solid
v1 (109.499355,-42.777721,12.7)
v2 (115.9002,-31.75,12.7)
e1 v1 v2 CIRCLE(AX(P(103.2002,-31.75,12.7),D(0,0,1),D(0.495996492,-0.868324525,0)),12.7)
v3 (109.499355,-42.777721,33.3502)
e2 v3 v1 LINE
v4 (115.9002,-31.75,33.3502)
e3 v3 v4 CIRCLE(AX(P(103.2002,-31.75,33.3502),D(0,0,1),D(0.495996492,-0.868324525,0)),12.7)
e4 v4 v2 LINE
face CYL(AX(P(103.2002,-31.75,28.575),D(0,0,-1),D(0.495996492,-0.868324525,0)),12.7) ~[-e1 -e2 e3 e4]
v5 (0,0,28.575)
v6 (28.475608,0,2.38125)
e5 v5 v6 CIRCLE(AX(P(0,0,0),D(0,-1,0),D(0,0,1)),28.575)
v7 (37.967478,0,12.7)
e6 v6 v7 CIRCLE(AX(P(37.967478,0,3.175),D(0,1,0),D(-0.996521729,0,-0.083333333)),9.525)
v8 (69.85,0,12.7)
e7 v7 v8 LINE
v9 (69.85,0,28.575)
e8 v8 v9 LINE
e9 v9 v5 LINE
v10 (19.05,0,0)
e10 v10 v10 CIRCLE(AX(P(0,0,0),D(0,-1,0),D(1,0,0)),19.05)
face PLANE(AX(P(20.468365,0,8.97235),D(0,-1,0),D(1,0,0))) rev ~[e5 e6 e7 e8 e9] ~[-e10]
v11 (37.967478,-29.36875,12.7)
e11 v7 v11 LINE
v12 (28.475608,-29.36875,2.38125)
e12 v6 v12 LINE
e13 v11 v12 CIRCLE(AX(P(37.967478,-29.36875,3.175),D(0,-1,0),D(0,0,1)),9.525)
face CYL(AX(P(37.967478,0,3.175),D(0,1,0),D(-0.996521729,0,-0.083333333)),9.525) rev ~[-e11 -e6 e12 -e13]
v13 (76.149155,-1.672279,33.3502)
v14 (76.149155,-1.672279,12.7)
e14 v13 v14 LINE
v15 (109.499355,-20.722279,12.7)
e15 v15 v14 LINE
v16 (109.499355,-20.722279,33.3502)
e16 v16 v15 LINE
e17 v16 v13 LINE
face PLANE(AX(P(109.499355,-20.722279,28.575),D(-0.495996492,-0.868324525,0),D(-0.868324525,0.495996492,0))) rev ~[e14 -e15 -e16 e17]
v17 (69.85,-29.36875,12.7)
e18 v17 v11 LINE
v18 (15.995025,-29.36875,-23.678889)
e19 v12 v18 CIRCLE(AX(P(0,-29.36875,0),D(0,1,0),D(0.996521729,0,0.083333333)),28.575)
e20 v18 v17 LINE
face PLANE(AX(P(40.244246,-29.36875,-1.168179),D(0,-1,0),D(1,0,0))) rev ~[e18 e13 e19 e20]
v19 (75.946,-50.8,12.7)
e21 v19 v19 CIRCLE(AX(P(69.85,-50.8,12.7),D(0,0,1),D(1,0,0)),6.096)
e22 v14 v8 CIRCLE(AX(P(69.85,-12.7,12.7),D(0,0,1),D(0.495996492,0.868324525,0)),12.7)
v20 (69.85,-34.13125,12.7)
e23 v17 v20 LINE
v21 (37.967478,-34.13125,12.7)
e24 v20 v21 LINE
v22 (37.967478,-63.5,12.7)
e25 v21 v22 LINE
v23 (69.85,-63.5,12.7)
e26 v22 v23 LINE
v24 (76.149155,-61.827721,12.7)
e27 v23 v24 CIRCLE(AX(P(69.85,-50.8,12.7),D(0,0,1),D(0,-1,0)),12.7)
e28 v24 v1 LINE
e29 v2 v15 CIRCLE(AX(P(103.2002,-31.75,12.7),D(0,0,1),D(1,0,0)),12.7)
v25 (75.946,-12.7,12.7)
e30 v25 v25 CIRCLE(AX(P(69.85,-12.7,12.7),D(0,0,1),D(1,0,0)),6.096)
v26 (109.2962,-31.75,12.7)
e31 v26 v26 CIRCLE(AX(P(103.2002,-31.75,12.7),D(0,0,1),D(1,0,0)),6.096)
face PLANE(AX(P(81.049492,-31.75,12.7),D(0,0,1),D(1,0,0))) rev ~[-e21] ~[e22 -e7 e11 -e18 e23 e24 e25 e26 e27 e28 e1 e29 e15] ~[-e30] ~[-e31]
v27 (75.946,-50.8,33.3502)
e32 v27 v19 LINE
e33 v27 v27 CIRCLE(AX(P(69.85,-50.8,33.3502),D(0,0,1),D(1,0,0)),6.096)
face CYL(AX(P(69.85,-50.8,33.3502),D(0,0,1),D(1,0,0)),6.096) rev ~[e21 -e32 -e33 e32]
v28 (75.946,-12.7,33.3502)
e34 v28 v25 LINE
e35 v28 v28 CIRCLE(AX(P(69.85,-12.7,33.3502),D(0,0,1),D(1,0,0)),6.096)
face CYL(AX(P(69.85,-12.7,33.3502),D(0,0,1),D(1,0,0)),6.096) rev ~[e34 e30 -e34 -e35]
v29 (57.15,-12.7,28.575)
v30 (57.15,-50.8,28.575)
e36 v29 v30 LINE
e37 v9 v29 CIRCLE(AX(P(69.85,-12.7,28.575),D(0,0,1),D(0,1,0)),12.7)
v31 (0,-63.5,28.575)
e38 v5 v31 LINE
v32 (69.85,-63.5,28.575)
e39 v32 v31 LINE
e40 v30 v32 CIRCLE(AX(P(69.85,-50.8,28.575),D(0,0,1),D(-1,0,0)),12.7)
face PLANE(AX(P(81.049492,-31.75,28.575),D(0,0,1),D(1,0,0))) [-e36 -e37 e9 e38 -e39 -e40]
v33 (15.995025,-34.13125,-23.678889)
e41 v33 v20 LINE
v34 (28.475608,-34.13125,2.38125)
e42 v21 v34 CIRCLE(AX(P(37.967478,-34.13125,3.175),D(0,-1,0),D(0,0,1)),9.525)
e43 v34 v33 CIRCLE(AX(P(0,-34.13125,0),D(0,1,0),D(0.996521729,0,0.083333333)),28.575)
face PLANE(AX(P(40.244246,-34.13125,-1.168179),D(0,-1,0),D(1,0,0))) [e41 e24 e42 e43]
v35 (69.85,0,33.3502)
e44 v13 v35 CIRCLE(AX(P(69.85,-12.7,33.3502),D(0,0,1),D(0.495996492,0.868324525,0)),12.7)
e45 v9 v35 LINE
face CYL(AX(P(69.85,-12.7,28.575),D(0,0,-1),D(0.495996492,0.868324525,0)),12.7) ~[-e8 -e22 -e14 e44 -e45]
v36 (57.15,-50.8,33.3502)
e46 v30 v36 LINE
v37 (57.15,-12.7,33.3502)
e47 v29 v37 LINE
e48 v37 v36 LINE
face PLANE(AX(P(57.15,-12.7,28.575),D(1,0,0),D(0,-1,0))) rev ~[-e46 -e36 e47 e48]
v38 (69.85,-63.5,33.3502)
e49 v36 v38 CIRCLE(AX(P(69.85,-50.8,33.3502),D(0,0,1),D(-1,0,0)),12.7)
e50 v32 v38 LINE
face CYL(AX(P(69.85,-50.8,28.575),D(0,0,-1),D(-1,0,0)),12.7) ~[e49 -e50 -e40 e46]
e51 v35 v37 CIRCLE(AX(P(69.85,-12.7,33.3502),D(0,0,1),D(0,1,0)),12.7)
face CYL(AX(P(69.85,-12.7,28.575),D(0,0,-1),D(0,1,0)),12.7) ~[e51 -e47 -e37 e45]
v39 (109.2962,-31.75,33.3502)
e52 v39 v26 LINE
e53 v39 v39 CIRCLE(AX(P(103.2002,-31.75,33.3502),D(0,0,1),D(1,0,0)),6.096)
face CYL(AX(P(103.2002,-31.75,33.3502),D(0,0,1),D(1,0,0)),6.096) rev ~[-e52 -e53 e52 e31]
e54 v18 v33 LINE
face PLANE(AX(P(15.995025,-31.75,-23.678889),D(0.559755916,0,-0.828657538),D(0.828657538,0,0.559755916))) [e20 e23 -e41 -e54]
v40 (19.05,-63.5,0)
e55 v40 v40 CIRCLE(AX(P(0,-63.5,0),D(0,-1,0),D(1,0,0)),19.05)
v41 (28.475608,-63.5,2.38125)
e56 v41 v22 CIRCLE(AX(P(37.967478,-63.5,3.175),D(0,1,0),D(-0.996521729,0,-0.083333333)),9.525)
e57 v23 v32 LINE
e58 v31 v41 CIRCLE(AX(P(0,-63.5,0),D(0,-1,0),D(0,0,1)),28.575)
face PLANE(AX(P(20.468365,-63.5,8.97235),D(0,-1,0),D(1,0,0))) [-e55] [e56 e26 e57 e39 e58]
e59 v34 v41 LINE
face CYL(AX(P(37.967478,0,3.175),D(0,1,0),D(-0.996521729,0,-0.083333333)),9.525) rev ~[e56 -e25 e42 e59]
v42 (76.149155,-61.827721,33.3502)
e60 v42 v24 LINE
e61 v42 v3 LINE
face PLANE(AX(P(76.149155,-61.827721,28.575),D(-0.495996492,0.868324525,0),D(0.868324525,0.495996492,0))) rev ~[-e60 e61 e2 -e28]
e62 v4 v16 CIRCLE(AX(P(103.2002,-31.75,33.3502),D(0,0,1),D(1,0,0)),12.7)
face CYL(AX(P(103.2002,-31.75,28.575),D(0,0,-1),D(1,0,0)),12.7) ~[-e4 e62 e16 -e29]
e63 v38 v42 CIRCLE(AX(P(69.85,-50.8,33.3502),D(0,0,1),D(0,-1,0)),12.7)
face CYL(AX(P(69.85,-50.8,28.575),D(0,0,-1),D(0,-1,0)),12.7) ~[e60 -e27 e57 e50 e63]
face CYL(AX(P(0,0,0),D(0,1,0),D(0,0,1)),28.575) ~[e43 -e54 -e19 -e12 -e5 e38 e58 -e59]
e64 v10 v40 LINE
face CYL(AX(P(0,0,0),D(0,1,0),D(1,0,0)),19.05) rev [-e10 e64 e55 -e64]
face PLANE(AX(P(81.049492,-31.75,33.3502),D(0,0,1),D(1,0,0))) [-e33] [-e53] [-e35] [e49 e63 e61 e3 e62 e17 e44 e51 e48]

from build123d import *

# Parameters (mm, degrees)
F0_R          = 19.05
F1_DEPTH      = 63.5
F3_DEPTH      = 15.875
F3_DEPTH_BACK = 4.7752
F4_R          = 6.096
F5_DEPTH      = 61.9262
F8_DEPTH      = 2.38125


with BuildPart() as f1:
    # F0 (on Front) → F1 (new body)
    with BuildSketch(Plane.XZ):
        with BuildLine():
            Line((69.85, 28.575), (0, 28.575))
            ThreePointArc((0, 28.575), (-19.345366451, -21.0306305629), (28.4756083945, 2.38125))
            ThreePointArc((28.4756083945, 2.38125), (30.9572676717, 9.6234554837), (37.9674778593, 12.7))
            Line((37.9674778593, 12.7), (69.85, 12.7))
            Line((69.85, 12.7), (69.85, 28.575))
        make_face()
        Circle(F0_R, mode=Mode.SUBTRACT)
    extrude(amount=F1_DEPTH)

    # F2 (on face) → F3 (join, two sides)
    with BuildSketch(Plane.XY.offset(28.575)) as f3_sk:
        with BuildLine():
            ThreePointArc((76.1491554441, -1.6722785358), (73.1086759125, -0.4251871176), (69.85, 0))
            ThreePointArc((69.85, 0), (60.8697438789, -3.7197438789), (57.15, -12.7))
            Line((57.15, -12.7), (57.15, -31.75))
            Line((57.15, -31.75), (57.15, -50.8))
            ThreePointArc((57.15, -50.8), (60.8697438789, -59.7802561211), (69.85, -63.5))
            ThreePointArc((69.85, -63.5), (73.1086759125, -63.0748128824), (76.1491554441, -61.8277214642))
            Line((76.1491554441, -61.8277214642), (109.4993554441, -42.7777214642))
            ThreePointArc((109.4993554441, -42.7777214642), (114.1840352623, -38.1253715915), (115.9002, -31.75))
            ThreePointArc((115.9002, -31.75), (114.1840352623, -25.3746284085), (109.4993554441, -20.7222785358))
            Line((109.4993554441, -20.7222785358), (76.1491554441, -1.6722785358))
        make_face()
    extrude(amount=-F3_DEPTH)
    extrude(f3_sk.sketch, amount=F3_DEPTH_BACK)

    # F4 (on face) → F5 (cut, through all)
    with BuildSketch(Plane.XY.offset(33.3502)):
        with Locations((69.85, -12.7)):
            Circle(F4_R)
        with Locations((69.85, -50.8)):
            Circle(F4_R)
        with Locations((103.2002, -31.75)):
            Circle(F4_R)
    extrude(amount=-F5_DEPTH, mode=Mode.SUBTRACT)

    # F7 (on offset) → F8 (join, symmetric)
    with BuildSketch(Plane.XZ.offset(31.75)):
        with BuildLine():
            ThreePointArc((28.4756083945, 2.38125), (25.7719232537, -12.3425522809), (15.9950252975, -23.6788891364))
            Line((15.9950252975, -23.6788891364), (69.85, 12.7))
            Line((69.85, 12.7), (37.9674778593, 12.7))
            ThreePointArc((37.9674778593, 12.7), (30.9572676717, 9.6234554837), (28.4756083945, 2.38125))
        make_face()
    extrude(amount=F8_DEPTH, both=True)


solid = f1.part
